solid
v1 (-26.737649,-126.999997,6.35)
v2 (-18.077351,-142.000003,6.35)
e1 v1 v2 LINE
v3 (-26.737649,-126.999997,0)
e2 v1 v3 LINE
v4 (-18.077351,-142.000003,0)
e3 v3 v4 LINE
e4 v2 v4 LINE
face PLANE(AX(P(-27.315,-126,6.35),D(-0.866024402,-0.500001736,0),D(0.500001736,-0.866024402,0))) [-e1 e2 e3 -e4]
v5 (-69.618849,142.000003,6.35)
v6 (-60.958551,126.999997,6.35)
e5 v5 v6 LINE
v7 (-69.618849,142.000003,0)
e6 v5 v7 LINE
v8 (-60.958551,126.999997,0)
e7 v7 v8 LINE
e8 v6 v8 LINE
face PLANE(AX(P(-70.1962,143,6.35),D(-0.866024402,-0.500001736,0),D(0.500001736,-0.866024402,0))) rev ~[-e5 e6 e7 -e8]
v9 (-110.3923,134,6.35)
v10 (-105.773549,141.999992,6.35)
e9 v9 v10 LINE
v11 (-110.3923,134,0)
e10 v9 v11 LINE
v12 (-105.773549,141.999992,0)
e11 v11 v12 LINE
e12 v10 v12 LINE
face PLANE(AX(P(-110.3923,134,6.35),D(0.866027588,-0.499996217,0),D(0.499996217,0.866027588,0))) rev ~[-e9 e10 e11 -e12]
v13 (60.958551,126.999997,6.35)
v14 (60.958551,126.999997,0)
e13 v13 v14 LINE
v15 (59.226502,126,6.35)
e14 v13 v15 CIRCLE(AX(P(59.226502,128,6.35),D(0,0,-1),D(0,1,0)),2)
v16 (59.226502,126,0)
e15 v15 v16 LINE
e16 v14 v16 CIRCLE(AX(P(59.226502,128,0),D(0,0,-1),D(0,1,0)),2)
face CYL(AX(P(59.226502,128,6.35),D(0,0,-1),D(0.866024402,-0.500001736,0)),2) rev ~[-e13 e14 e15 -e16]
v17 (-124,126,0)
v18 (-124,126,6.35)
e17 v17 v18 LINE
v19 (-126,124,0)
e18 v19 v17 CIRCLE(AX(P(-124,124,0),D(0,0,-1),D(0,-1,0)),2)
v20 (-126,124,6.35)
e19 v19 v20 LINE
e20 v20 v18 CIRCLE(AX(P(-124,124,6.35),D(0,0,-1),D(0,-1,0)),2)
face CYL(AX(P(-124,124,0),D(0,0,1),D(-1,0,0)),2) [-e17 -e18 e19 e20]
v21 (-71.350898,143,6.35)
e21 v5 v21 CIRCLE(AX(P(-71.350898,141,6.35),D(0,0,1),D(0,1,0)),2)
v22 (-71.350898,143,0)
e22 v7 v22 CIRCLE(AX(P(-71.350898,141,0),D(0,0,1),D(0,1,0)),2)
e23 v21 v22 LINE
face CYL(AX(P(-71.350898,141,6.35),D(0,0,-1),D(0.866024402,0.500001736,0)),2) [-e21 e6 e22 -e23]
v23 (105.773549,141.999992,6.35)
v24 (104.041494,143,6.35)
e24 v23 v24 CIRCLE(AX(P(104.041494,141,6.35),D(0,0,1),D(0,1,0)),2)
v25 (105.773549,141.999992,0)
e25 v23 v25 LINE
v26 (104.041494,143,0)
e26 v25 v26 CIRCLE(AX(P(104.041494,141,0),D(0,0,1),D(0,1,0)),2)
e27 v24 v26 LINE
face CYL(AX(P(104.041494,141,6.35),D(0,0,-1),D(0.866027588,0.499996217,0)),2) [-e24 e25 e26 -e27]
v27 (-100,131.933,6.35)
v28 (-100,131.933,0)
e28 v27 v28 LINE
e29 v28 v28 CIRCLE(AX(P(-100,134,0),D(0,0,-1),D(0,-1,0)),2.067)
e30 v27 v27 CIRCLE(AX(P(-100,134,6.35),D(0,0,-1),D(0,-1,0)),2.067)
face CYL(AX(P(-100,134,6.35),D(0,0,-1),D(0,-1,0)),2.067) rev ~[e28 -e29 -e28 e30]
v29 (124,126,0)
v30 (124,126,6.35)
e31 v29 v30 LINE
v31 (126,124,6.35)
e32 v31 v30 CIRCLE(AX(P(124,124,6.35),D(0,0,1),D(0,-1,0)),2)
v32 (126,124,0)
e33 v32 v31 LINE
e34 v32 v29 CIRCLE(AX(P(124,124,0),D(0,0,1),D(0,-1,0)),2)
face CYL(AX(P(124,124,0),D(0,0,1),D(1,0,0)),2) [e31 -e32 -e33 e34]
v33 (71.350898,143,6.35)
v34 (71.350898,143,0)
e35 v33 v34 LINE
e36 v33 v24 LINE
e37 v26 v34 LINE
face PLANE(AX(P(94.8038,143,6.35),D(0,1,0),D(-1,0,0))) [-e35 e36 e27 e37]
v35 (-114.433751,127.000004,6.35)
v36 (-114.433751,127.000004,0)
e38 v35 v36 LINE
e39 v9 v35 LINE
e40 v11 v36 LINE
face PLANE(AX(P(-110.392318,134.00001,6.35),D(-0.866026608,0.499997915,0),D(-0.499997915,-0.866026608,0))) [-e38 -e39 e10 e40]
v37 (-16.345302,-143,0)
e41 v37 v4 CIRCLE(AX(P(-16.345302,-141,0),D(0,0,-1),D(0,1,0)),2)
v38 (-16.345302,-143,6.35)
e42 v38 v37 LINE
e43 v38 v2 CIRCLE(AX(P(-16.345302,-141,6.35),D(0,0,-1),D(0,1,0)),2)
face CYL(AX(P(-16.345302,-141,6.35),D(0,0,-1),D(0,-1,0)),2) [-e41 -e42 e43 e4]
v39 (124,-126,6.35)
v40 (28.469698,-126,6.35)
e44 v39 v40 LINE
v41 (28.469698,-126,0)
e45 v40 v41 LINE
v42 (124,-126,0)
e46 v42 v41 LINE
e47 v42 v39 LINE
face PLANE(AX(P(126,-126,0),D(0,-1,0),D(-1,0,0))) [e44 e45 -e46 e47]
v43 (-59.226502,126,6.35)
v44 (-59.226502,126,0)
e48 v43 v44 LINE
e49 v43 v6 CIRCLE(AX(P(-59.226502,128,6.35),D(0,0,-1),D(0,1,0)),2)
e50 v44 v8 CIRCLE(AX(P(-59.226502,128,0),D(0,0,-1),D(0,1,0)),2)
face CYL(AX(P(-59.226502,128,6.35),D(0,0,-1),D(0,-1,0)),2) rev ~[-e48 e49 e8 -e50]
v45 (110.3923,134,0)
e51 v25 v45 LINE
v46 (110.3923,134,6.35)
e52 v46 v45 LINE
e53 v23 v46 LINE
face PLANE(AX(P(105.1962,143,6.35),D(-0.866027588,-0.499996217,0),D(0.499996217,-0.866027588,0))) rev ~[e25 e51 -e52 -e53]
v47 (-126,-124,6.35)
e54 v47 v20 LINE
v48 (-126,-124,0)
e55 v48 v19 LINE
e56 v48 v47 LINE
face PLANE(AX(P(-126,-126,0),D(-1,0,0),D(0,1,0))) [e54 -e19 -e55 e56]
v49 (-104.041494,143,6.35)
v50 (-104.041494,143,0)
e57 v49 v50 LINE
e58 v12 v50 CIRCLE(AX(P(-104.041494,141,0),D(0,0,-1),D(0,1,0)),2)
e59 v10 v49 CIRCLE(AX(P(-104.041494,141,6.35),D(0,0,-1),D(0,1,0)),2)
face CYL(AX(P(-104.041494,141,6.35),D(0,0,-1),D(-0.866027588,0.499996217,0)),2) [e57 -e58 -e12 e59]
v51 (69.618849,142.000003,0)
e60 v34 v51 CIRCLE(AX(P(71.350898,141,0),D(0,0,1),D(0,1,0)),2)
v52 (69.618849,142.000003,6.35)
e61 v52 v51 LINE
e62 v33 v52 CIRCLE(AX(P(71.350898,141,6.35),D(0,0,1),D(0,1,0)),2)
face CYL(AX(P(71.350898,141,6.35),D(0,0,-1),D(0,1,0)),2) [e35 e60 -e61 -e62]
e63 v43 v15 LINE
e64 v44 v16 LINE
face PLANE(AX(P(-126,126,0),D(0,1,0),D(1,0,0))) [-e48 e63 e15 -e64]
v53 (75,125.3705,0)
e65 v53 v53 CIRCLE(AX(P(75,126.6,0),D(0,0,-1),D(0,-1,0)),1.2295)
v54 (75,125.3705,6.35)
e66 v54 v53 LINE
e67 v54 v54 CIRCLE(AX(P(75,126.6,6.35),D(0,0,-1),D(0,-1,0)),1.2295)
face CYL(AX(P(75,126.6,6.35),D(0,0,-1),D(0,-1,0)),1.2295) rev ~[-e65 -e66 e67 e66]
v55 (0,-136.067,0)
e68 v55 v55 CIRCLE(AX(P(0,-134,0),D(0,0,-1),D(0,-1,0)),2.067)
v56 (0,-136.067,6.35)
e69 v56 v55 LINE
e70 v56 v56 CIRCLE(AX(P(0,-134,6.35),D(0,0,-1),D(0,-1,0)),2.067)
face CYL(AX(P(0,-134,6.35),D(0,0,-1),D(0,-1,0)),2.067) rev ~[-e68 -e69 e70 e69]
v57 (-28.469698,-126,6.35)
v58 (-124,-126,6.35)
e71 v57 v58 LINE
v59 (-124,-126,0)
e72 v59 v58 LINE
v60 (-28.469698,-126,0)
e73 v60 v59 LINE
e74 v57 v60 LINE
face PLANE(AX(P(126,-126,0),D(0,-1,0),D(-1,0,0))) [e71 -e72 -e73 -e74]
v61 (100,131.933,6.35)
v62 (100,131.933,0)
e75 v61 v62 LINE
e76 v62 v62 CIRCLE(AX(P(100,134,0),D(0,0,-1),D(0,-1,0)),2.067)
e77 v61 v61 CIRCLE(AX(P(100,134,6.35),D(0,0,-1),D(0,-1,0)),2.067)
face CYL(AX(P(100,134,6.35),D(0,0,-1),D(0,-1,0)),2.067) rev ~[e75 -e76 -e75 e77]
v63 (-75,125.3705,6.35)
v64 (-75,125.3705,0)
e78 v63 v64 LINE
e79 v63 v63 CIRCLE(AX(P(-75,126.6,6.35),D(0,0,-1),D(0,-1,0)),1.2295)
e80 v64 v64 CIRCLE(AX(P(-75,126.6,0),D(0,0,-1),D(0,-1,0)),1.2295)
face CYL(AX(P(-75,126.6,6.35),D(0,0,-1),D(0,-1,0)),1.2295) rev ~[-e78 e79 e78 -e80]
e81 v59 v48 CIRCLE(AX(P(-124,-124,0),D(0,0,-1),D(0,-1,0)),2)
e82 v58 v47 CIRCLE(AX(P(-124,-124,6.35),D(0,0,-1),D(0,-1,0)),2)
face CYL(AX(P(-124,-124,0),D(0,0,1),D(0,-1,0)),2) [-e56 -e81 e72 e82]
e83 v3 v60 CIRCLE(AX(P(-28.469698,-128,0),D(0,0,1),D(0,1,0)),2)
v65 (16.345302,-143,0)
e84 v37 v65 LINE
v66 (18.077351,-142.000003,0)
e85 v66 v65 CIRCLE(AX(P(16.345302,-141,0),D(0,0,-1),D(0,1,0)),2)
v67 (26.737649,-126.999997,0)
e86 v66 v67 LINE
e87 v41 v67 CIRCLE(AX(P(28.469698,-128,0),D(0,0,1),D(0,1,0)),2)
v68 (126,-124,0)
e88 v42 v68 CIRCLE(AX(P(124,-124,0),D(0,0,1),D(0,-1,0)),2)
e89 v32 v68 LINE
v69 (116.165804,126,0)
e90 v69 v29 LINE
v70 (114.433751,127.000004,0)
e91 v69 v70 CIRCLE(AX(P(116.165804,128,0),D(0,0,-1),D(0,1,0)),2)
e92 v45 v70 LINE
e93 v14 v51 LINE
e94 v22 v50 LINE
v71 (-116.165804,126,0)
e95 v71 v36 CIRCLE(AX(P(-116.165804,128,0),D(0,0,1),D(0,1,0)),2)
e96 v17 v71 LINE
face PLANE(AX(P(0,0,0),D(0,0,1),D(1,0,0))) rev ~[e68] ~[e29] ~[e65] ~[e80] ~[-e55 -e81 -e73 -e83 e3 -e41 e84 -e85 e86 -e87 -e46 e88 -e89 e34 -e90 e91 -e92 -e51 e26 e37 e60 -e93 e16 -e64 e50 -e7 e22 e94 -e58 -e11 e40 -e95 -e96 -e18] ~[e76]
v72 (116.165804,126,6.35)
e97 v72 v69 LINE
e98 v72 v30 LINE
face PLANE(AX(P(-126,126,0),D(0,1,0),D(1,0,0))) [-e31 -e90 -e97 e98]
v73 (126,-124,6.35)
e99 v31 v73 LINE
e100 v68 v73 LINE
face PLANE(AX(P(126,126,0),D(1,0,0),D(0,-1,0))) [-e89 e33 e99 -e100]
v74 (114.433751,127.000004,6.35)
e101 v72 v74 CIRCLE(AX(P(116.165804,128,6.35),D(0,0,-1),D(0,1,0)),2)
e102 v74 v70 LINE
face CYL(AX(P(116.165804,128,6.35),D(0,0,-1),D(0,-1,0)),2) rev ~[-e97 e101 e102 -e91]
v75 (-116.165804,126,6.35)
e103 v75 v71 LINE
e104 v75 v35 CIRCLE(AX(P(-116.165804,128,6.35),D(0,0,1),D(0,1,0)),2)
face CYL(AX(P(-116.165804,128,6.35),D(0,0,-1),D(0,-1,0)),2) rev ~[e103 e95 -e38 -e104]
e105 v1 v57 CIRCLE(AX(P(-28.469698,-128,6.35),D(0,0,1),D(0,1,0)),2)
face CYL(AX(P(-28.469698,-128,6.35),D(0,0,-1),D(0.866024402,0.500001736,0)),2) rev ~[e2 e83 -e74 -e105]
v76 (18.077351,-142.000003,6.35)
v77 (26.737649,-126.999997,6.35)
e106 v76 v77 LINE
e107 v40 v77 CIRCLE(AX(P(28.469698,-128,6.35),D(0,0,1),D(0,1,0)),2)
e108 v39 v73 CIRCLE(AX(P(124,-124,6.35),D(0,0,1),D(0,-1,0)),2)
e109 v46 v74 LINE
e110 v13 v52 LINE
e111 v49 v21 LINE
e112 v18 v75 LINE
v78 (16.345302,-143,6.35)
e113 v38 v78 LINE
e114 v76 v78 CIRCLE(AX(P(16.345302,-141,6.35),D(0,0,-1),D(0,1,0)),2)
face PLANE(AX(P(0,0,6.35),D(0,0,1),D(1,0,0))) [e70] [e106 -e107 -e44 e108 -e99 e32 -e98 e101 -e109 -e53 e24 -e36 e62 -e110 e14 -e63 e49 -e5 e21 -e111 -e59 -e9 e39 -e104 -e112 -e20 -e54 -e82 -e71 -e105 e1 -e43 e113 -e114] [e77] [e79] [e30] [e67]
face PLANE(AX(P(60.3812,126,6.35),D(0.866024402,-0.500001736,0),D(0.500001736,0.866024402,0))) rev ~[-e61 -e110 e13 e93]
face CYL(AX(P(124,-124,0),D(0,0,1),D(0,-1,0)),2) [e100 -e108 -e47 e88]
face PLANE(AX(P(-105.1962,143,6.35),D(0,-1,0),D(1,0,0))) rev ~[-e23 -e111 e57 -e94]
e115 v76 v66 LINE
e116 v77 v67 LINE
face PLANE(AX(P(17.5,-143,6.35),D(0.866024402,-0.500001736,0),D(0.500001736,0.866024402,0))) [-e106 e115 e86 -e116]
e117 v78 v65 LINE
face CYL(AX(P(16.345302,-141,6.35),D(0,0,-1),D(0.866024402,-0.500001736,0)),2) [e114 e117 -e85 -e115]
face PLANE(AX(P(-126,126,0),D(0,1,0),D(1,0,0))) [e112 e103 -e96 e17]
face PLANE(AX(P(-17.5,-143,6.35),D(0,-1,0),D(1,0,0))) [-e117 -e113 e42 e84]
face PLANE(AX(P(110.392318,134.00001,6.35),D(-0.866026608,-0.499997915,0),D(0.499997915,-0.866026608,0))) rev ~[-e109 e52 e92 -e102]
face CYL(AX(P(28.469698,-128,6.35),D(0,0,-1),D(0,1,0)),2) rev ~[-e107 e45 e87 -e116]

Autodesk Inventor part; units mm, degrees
ref_plane "YZ Plane" through (0, 0, 0) normal (1, 0, 0) x (0, 1, 0)
ref_plane "XZ Plane" through (0, 0, 0) normal (0, 1, 0) x (-1, 0, 0)
ref_plane "XY Plane" through (0, 0, 0) normal (0, 0, 1) x (1, 0, 0)
sketch "Sketch1" plane through (0, 0, 0) normal (0, 0, 1) x (1, 0, 0)
  line L0 (126, -126) -> (-126, -126)
  line L1 (-126, -126) -> (-126, 126)
  line L2 (-126, 126) -> (126, 126)
  line L3 (126, 126) -> (126, -126)
  line L4 (126, -126) -> (-126, 126) construction
  line L5 (-126, -126) -> (126, 126) construction
  point P0 (0, 0)
  dimension "d0" = 252
  dimension "d1" = 252
extrude "Extrusion1" add sketch "Sketch1" along normal blind 6.35
sketch "Sketch2" plane through (0, 0, 6.35) normal (0, 0, 1) x (1, 0, 0)
  line L0 (-110.3923, 134) -> (-105.1962, 143)
  line L1 (-105.1962, 143) -> (-94.8038, 143)
  line L2 (-94.8038, 143) -> (-89.6077, 134)
  line L3 (-89.6077, 134) -> (-94.8038, 125)
  line L4 (-94.8038, 125) -> (-105.1962, 125)
  line L5 (-105.1962, 125) -> (-110.3923, 134)
  line L6 (94.8038, 143) -> (105.1962, 143)
  line L7 (105.1962, 143) -> (110.3923, 134)
  line L8 (110.3923, 134) -> (105.1962, 125)
  line L9 (105.1962, 125) -> (94.8038, 125)
  line L10 (94.8038, 125) -> (89.6077, 134)
  line L11 (89.6077, 134) -> (94.8038, 143)
  line L12 (-100, 134) -> (100, 134) construction
  line L13 (126, 126) -> (-126, 126) projected
  line L14 (-105.1962, 143) -> (-115.0111, 126)
  line L15 (105.1962, 143) -> (115.0111, 126)
  line L16 (94.8038, 143) -> (-94.8038, 143)
  line L17 (-126, -126) -> (126, -126) projected
  line L18 (-27.315, -126) -> (-17.5, -143)
  line L19 (-17.5, -143) -> (17.5, -143)
  line L20 (17.5, -143) -> (27.315, -126)
  line L21 (-70.1962, 143) -> (-60.3812, 126)
  line L22 (60.3812, 126) -> (70.1962, 143)
  point P0 (0, 0)
  point P1 (0, 134)
  point P2 (0, -143)
  point P3 (0, -134)
  dimension "d4" = 18
  dimension "d5" = 200
  dimension "d6" = 8
  dimension "d7" = 17
  dimension "d8" = 17
  dimension "d9" = 35
  dimension "d10" = 8
  dimension "d32" = 35
  dimension "d33" = 35
extrude "Extrusion2" add sketch "Sketch2" against normal up to surface (6.35 mm away) contours L0 L1 L2 L3 L13 L5 | L5 L13 L14 | L16 L21 L13 L3 L2 | L16 L11 L10 L13 L22 | L6 L7 L8 L13 L10 L11 | L8 L15 L13 | L17 L20 L19 L18
hole "Hole1" at (0, -134, 6.35) at (-100, 134, 6.35) at (100, 134, 6.35) direction (0, 0, -1) diameter 4.134 end through all thread size "M5x0.8" class "6H" standard "ANSI Metric M Profile"
fillet "Fillet1" radius 2 16 edges at (17.5, -143, 3.175) (27.315, -126, 3.175) (126, -126, 3.175) (-126, 126, 3.175) (115.0111, 126, 3.175) (105.1962, 143, 3.175) (126, 126, 3.175) (-27.315, -126, 3.175) (-17.5, -143, 3.175) (-126, -126, 3.175) (-115.0111, 126, 3.175) (-105.1962, 143, 3.175) (-70.1962, 143, 3.175) (-60.3812, 126, 3.175) (60.3812, 126, 3.175) (70.1962, 143, 3.175)
sketch "Sketch3" plane through (0, 0, 6.35) normal (0, 0, 1) x (1, 0, 0)
  line L0 (150, -125) -> (-150, -125) construction
  line L1 (-150, -125) -> (-150, 125) construction
  line L2 (-150, 125) -> (150, 125) construction
  line L3 (150, 125) -> (150, -125) construction
  line L4 (150, -125) -> (-150, 125) construction
  line L5 (-150, -125) -> (150, 125) construction
  circle A0 centre (-75, 126.6) radius 1.6 construction
  line L6 (-75, 126.6) -> (75, 126.6) construction
  circle A1 centre (75, 126.6) radius 1.6 construction
  point P0 (0, 0)
  point P1 (0, 126.6)
  dimension "d21" = 300
  dimension "d22" = 250
  dimension "d23" = 3.2
  dimension "d24" = 150
hole "Hole2" at (-75, 126.6, 6.35) at (75, 126.6, 6.35) direction (0, 0, -1) diameter 2.459 end through all thread size "M3x0.5" class "6H" standard "ANSI Metric M Profile"
equation "\"d7\" = d8"
equation "\"d10\" = d6"
equation "\"d32\" = d9"
equation "\"d33\" = d32"
properties part number "Print Bed" material "Aluminum 6061"
